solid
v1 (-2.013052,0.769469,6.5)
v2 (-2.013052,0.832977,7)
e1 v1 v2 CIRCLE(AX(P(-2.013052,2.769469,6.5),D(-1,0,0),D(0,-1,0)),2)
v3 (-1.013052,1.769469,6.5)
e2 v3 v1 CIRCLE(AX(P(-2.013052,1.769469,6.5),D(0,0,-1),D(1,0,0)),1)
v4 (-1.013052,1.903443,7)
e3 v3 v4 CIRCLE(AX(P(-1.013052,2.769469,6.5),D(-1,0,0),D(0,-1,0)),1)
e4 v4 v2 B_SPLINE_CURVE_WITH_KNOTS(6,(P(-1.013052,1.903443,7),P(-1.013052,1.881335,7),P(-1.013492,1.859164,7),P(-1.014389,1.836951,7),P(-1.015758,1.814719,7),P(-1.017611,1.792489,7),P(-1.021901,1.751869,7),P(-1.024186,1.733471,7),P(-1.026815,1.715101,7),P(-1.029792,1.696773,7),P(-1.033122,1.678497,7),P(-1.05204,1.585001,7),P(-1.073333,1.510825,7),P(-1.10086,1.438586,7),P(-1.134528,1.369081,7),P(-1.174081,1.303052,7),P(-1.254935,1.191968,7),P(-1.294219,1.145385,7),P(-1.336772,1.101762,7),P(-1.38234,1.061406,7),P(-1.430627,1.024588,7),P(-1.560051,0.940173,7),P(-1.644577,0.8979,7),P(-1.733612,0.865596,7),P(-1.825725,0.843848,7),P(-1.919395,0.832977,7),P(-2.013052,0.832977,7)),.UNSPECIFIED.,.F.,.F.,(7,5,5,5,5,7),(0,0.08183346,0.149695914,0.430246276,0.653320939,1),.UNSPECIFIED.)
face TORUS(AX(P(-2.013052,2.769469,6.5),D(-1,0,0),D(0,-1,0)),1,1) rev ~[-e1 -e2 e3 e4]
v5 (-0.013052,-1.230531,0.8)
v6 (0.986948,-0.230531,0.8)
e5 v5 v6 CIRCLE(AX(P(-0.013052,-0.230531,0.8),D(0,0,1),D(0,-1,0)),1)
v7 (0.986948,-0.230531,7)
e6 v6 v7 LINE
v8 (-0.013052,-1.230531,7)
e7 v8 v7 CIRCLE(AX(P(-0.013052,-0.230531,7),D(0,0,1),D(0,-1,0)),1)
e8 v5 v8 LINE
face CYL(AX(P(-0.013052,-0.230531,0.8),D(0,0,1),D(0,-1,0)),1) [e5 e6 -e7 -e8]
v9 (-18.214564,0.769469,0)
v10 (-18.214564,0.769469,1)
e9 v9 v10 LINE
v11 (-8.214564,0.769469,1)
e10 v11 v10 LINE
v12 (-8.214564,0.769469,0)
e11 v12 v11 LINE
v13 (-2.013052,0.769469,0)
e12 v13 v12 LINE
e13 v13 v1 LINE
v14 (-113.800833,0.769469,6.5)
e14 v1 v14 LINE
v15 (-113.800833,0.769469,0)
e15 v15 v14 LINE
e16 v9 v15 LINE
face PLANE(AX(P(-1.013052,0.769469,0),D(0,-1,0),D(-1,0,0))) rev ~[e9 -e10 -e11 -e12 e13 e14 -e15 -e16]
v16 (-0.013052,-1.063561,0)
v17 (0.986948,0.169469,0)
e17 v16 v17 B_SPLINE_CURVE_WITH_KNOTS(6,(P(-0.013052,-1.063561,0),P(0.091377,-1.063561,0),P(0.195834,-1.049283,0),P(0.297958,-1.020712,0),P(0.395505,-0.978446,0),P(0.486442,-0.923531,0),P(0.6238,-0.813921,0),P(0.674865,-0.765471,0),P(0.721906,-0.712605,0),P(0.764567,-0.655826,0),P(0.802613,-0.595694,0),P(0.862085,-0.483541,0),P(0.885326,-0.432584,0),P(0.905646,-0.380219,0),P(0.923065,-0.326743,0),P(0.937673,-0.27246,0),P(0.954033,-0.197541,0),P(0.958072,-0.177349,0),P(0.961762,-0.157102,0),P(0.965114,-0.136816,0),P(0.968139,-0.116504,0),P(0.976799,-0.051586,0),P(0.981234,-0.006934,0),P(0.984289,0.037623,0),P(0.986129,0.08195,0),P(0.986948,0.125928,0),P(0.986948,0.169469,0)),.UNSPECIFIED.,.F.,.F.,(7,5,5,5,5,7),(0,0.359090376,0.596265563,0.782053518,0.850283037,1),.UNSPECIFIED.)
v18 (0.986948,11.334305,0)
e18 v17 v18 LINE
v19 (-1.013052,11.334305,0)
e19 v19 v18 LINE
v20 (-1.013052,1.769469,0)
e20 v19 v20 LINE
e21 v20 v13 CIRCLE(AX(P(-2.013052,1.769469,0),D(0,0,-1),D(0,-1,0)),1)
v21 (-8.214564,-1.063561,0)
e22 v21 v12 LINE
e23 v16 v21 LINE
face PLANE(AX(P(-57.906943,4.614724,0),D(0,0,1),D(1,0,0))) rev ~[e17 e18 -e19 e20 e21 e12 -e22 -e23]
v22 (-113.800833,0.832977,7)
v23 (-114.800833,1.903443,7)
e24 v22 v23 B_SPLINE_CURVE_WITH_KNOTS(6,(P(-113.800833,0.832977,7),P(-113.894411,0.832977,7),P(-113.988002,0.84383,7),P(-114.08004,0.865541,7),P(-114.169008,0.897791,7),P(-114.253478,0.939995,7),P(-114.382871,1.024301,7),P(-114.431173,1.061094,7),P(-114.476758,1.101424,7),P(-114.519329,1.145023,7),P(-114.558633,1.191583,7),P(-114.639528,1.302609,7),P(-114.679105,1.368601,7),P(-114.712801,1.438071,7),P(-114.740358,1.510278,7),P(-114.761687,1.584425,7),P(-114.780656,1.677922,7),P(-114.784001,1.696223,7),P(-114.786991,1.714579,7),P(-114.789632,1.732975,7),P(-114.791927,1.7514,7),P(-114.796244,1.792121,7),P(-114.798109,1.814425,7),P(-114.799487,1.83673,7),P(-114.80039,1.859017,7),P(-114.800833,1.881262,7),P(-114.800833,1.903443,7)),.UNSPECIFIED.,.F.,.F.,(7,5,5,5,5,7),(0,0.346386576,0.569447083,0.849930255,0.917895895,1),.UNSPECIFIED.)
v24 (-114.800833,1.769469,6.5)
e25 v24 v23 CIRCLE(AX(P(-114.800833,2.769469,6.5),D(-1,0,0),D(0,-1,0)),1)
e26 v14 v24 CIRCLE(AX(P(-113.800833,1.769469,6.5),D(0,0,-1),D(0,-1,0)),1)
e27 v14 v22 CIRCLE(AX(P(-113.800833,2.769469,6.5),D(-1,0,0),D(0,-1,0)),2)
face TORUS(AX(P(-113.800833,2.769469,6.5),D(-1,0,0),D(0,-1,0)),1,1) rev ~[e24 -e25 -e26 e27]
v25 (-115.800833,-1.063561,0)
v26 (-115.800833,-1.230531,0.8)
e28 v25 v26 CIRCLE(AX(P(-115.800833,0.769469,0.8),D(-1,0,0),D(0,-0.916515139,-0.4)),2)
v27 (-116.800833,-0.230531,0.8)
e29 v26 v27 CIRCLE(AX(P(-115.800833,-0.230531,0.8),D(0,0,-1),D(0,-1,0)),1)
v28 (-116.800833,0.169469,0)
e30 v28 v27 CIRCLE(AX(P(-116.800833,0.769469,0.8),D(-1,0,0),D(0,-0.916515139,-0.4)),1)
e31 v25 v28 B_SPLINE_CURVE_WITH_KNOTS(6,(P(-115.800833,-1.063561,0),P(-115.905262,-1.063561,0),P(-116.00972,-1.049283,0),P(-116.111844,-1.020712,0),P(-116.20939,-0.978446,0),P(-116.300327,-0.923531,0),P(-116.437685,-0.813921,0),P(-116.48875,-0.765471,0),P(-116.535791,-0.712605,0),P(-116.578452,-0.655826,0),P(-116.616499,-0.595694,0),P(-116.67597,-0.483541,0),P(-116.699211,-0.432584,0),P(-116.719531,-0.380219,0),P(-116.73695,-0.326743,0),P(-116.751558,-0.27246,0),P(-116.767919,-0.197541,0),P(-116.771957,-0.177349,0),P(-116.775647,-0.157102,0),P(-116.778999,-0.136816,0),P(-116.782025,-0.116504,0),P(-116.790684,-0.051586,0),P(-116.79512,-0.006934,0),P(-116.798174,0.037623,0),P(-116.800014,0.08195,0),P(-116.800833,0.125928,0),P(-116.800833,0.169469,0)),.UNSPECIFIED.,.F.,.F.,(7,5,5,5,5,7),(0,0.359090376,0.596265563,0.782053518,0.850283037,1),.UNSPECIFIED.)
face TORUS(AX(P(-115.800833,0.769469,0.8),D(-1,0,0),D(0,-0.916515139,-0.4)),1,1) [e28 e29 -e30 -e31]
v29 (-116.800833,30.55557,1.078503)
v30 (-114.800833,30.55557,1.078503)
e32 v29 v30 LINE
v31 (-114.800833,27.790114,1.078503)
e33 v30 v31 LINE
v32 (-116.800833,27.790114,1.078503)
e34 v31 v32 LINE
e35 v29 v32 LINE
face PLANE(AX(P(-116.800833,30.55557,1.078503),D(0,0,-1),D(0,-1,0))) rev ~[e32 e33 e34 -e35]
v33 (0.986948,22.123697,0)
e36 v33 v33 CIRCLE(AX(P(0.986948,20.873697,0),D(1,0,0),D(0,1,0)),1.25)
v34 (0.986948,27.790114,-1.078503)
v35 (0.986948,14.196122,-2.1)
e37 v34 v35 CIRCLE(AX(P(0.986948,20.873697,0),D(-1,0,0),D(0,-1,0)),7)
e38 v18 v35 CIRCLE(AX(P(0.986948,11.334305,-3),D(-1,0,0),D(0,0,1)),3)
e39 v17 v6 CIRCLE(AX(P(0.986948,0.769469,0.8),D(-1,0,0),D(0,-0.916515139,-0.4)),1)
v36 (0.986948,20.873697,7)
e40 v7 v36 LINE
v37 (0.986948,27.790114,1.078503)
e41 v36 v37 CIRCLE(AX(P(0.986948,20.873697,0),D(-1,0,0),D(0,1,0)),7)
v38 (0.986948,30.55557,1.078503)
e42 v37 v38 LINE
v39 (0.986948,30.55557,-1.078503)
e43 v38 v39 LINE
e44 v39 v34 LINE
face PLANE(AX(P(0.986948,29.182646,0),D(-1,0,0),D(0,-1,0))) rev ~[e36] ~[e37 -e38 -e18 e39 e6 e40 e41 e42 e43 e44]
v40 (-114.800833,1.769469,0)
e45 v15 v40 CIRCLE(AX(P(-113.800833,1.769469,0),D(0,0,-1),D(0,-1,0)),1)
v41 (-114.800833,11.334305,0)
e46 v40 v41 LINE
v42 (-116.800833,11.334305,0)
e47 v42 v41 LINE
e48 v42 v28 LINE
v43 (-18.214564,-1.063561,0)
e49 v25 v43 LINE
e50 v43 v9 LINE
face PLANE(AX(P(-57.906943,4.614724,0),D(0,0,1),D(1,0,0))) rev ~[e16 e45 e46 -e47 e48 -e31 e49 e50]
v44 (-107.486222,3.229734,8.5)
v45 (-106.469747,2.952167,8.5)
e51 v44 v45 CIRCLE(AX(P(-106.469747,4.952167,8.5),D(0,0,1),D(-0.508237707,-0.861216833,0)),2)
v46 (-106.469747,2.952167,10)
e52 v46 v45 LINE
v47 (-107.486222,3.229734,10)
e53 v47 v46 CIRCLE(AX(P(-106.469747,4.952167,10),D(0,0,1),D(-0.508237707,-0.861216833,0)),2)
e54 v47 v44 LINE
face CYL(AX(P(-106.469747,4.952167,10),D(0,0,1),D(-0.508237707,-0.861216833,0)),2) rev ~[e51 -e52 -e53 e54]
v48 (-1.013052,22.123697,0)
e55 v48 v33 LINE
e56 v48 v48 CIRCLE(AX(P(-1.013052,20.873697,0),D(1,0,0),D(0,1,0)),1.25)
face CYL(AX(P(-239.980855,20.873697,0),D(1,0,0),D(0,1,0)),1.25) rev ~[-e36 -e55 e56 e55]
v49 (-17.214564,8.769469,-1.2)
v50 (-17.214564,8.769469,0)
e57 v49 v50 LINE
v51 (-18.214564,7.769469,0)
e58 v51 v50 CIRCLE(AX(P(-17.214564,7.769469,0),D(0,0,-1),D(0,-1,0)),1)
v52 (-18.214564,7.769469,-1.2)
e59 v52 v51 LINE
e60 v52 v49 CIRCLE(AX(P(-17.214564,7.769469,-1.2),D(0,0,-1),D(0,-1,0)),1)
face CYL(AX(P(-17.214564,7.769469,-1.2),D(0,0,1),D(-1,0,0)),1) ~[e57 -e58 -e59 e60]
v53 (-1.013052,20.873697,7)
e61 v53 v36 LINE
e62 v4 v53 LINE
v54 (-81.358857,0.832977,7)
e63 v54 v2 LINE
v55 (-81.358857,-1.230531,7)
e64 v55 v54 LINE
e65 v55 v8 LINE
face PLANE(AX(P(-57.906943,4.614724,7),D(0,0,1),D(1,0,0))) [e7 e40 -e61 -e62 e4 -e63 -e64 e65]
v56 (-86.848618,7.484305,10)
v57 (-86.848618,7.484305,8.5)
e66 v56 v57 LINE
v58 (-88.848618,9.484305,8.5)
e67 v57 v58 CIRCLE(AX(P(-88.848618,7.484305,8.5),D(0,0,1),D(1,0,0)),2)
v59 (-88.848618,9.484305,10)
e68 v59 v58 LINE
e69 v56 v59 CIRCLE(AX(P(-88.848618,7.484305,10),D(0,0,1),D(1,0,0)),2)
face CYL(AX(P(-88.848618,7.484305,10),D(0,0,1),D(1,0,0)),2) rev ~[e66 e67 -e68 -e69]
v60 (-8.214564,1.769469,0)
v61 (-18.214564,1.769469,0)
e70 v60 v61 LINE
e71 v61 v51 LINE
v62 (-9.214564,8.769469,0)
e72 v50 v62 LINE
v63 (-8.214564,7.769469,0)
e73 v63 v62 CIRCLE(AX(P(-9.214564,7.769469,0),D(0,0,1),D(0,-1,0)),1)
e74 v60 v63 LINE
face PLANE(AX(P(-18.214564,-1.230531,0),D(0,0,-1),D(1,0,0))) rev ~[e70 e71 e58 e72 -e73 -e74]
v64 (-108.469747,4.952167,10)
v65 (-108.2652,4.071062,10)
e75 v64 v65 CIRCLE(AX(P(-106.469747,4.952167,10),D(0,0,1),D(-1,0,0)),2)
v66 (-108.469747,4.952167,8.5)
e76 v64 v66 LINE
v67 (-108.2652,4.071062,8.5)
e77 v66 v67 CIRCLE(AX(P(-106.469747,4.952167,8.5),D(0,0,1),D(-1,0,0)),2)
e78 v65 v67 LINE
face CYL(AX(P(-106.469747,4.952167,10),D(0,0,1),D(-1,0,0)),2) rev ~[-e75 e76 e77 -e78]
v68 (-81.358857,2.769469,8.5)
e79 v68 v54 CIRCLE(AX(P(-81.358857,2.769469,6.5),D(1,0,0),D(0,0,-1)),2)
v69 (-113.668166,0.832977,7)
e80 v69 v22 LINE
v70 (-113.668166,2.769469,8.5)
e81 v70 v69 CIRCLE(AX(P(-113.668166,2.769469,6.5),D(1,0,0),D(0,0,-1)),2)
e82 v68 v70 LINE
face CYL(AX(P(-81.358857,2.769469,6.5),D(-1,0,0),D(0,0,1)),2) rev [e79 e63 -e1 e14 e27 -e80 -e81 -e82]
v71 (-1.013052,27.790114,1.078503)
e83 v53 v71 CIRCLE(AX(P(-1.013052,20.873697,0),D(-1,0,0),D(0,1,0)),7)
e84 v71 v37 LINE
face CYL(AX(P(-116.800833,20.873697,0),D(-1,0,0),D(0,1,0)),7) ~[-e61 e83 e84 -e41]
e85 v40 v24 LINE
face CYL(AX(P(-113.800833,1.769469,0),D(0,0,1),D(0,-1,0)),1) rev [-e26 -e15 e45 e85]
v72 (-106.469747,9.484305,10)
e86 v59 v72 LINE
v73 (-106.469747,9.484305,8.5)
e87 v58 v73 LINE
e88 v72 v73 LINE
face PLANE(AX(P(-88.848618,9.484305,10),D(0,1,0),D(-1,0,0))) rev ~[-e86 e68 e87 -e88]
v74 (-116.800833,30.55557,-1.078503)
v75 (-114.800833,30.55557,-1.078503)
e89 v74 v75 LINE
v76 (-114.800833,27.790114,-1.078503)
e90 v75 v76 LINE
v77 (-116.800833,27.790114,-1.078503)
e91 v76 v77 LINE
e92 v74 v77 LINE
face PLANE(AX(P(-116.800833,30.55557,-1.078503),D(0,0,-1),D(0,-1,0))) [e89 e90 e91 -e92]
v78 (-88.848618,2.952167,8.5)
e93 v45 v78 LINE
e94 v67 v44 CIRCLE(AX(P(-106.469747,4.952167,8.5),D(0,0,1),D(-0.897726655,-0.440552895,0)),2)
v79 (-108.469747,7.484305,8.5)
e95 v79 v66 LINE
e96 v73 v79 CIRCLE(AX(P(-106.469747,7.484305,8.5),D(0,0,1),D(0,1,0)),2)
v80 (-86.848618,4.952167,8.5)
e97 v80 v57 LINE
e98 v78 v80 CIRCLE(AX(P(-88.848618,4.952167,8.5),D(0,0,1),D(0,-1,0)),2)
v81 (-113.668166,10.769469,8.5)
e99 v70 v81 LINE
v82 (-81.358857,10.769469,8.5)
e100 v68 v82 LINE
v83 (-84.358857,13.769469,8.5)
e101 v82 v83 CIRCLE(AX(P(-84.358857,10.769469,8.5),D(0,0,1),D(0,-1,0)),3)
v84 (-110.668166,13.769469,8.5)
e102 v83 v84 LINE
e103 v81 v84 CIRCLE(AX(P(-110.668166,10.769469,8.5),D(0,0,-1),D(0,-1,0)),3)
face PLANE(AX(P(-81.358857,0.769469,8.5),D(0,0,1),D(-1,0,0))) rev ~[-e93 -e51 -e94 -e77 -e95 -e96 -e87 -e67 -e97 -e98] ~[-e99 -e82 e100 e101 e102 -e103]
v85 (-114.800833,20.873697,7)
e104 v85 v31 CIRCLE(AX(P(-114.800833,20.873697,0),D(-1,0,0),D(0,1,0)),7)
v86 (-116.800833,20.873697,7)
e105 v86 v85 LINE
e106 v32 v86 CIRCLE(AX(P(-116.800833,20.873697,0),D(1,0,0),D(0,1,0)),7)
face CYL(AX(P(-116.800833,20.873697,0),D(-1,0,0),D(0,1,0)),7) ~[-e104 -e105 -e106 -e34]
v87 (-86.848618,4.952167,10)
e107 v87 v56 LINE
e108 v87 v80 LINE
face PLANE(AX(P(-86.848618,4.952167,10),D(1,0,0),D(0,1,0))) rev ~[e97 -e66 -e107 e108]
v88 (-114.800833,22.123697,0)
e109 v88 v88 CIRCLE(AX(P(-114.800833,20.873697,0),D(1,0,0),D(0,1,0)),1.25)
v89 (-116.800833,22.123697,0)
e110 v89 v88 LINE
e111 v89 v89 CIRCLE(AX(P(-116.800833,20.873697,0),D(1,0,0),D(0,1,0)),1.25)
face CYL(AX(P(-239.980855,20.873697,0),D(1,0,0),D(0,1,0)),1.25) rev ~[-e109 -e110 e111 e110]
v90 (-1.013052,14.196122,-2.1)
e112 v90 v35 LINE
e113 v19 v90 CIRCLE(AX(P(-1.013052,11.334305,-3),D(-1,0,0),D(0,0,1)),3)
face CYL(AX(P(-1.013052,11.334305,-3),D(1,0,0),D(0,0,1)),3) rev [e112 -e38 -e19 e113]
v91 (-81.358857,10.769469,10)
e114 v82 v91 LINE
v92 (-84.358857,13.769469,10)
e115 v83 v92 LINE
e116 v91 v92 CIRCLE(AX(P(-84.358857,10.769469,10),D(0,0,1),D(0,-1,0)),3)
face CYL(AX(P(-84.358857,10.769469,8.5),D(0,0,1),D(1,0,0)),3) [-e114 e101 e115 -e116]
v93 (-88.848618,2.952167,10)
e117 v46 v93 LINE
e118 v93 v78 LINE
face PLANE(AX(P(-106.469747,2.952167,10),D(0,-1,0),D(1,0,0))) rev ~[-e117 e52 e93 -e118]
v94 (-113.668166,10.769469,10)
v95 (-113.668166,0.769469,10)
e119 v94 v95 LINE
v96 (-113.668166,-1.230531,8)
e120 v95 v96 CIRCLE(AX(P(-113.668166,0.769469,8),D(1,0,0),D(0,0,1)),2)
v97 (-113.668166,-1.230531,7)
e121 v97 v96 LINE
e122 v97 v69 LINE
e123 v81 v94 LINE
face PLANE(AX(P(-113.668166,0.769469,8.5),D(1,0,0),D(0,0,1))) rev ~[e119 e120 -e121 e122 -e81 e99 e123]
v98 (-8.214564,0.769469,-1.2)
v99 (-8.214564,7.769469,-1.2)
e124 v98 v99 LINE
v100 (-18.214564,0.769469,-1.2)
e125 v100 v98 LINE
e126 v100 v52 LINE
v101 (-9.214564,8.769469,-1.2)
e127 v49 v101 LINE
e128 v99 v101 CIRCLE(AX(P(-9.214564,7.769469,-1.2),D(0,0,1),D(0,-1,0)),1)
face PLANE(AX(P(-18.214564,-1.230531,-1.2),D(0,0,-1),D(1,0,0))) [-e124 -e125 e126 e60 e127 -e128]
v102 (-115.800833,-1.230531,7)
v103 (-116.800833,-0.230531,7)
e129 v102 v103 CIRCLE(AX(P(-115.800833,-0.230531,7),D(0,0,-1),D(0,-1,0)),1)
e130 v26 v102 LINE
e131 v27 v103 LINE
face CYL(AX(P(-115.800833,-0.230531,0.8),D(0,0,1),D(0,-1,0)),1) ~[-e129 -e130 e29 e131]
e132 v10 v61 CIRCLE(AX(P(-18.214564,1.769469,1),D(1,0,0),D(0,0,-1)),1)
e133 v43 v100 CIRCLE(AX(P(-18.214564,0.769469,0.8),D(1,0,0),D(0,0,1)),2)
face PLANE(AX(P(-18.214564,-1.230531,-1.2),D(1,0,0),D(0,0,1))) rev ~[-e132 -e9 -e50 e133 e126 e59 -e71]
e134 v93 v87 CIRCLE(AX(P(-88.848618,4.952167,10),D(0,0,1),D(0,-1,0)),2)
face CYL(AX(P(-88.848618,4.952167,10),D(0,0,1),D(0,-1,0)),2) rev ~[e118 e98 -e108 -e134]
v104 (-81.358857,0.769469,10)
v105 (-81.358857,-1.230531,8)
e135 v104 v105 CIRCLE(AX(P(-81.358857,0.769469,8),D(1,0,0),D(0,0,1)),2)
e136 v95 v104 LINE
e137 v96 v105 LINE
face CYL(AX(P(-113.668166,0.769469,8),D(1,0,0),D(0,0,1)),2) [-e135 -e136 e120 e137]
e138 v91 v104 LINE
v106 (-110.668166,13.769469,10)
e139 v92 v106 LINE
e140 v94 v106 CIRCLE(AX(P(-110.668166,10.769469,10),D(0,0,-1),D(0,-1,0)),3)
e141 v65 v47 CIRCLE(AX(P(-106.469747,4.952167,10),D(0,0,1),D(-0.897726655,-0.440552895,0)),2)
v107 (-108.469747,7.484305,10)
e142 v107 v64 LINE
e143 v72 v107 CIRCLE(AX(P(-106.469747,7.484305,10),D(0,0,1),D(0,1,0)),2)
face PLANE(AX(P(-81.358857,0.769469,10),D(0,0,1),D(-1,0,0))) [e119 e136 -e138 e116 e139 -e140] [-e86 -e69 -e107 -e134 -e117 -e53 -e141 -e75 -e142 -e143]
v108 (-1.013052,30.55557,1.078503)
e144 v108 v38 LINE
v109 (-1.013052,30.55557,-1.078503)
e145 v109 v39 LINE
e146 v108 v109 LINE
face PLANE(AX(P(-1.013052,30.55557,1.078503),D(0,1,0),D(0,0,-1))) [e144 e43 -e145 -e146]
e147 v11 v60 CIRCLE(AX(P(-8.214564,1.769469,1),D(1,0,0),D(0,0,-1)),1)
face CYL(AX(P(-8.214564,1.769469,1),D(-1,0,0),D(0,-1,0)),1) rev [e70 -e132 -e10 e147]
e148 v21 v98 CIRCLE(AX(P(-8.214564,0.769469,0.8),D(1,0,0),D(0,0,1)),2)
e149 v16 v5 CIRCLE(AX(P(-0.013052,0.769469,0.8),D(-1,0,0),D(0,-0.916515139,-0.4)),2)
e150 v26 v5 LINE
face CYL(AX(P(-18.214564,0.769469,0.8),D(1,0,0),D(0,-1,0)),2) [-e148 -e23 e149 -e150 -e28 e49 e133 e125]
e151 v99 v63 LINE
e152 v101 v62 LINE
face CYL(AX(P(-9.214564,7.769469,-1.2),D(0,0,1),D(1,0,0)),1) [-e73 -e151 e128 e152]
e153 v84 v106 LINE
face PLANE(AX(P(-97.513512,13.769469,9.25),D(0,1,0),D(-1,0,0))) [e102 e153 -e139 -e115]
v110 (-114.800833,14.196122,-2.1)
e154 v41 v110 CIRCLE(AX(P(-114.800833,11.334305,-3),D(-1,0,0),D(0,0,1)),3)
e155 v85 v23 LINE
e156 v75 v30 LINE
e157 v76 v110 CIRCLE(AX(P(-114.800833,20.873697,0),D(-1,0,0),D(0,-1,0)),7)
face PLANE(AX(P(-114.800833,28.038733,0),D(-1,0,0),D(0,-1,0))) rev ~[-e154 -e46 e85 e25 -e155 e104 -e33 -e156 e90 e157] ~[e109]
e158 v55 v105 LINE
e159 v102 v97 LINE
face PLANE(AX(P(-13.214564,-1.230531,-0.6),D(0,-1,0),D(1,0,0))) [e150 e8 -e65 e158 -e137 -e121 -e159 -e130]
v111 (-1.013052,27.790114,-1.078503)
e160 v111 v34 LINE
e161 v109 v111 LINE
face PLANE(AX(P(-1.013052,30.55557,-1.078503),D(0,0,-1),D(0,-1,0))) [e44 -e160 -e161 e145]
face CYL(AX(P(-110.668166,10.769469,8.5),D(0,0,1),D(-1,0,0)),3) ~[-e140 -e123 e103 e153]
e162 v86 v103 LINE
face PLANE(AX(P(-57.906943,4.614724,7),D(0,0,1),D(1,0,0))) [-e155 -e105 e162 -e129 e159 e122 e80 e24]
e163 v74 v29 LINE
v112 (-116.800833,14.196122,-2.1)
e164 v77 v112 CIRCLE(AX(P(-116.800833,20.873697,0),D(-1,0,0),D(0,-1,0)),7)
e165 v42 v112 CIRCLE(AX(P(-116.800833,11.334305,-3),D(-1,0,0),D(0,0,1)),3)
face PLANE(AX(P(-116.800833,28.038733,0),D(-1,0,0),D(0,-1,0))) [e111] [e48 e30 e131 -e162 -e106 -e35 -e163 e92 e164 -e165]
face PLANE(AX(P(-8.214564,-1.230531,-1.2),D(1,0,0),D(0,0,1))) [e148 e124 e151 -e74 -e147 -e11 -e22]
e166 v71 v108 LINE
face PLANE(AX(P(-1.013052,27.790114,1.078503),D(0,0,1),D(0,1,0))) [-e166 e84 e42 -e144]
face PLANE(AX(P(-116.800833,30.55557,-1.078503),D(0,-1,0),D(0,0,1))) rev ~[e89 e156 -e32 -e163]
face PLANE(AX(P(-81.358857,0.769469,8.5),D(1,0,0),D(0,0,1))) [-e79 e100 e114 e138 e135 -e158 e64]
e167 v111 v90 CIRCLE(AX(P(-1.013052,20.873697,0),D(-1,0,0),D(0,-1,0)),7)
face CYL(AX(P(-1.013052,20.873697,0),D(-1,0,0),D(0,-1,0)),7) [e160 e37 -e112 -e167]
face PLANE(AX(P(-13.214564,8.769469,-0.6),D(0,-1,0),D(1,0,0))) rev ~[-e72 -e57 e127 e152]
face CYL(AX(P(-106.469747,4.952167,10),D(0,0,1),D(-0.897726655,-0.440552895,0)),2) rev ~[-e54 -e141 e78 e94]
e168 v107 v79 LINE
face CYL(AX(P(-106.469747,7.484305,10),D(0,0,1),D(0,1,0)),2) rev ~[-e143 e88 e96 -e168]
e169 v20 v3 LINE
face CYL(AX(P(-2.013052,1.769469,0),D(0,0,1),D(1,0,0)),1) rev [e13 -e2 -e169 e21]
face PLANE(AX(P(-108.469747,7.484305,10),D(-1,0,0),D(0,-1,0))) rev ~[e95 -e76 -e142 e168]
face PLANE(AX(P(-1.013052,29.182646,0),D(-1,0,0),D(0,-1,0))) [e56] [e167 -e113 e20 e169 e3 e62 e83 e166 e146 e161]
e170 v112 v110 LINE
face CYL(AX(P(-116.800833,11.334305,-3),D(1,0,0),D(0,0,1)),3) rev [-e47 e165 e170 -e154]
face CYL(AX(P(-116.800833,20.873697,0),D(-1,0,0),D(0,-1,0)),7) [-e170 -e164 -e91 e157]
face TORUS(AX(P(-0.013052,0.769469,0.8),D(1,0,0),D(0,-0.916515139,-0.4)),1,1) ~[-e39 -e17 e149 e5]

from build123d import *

# Parameters (mm, degrees)
F1_DEPTH  = 7
F2_R      = 7
F3_DEPTH  = 2
F4_R      = 7
F5_DEPTH  = 2
F6_W      = 32.3093086481
F6_H      = 2
F7_DEPTH  = 3
F8_W      = 32.3093086481
F8_H      = 1.5
F9_DEPTH  = 13
F11_W     = 10
F11_H     = 1.2
F12_DEPTH = 10
F13_DEPTH = 25
F14_R     = 3
F15_R     = 2
F16_R     = 1
F17_DEPTH = 117.7887811979
F18_R     = 3
F19_W     = 5.0336755812
F19_H     = 2.1570066456
F20_DEPTH = 2
F22_DEPTH = 2
F23_D     = 2.5


with BuildPart() as f1:
    # F0 (on Top) → F1 (new body)
    with BuildSketch(Plane.XY):
        Polygon((-114.8008331656, 27.8736967593), (-116.8008331656, 27.8736967593), (-116.8008331656, -1.2305311393), (0.9869479323, -1.2305311393), (0.9869479323, 27.8736967593), (-1.0130520677, 27.8736967593), (-1.0130520677, 0.7694688607), (-114.8008331656, 0.7694688607), align=None)
    extrude(amount=F1_DEPTH)

    # F2 (on face) → F3 (join)
    with BuildSketch(Plane(origin=(-116.8008331656, 0, 0), x_dir=(0, -1, 0), z_dir=(-1, 0, 0))):
        with Locations((-20.8736967593, 0)):
            Circle(F2_R)
    extrude(amount=-F3_DEPTH)

    # F4 (on face) → F5 (join)
    with BuildSketch(Plane(origin=(-1.0130520677, 0, 0), x_dir=(0, -1, 0), z_dir=(-1, 0, 0))):
        with Locations((-20.8736967593, 0)):
            Circle(F4_R)
    extrude(amount=-F5_DEPTH)

    # F6 (on face) → F7 (join)
    with BuildSketch(Plane.XY.offset(7)):
        with Locations((-97.5135117769, -0.2305311393)):
            Rectangle(F6_W, F6_H)
    extrude(amount=F7_DEPTH)

    # F8 (on face) → F9 (join)
    with BuildSketch(Plane(origin=(0, 0.7694688607, 0), x_dir=(-1, 0, 0), z_dir=(0, 1, 0))):
        with Locations((97.5135117769, 9.25)):
            Rectangle(F8_W, F8_H)
    extrude(amount=F9_DEPTH)

    # F11 (on face) → F12 (join)
    with BuildSketch(Plane.XZ.offset(1.2305311393)):
        with Locations((-13.2145643048, -0.6)):
            Rectangle(F11_W, F11_H)
    extrude(amount=-F12_DEPTH)

    # F10 (on face) → F13 (cut)
    with BuildSketch(Plane.XY.offset(10)):
        with BuildLine():
            ThreePointArc((-86.8486179709, 7.4843045808), (-87.4344044086, 8.8985181432), (-88.8486179709, 9.4843045808))
            Line((-88.8486179709, 9.4843045808), (-106.4697470069, 9.4843045808))
            ThreePointArc((-106.4697470069, 9.4843045808), (-107.8839605693, 8.8985181432), (-108.4697470069, 7.4843045808))
            Line((-108.4697470069, 7.4843045808), (-108.4697470069, 4.9521672986))
            ThreePointArc((-108.4697470069, 4.9521672986), (-108.4179393254, 4.4998989157), (-108.2652003167, 4.0710615092))
            ThreePointArc((-108.2652003167, 4.0710615092), (-107.9372939182, 3.5933788445), (-107.4862224218, 3.2297336335))
            ThreePointArc((-107.4862224218, 3.2297336335), (-106.996592653, 3.0228063513), (-106.4697470069, 2.9521672986))
            Line((-106.4697470069, 2.9521672986), (-88.8486179709, 2.9521672986))
            ThreePointArc((-88.8486179709, 2.9521672986), (-87.4344044086, 3.5379537363), (-86.8486179709, 4.9521672986))
            Line((-86.8486179709, 4.9521672986), (-86.8486179709, 7.4843045808))
        make_face()
    extrude(amount=-F13_DEPTH, mode=Mode.SUBTRACT)

    # F14
    f14_edges = [f1.edges().sort_by_distance(p)[0] for p in [
        (-113.668166, 13.769469, 9.25),
        (-81.358857, 13.769469, 9.25),
    ]]
    fillet(f14_edges, radius=F14_R)

    # F15
    f15_edges = [f1.edges().sort_by_distance(p)[0] for p in [
        (-97.513512, -1.230531, 10),
        (-97.513512, 0.769469, 8.5),
        (-13.214564, -1.230531, -1.2),
    ]]
    fillet(f15_edges, radius=F15_R)

    # F16
    f16_edges = [f1.edges().sort_by_distance(p)[0] for p in [
        (-13.214564, 0.769469, 0),
        (-1.013052, 0.769469, 3.25),
        (0.986948, -1.230531, 3.9),
        (-116.800833, -1.230531, 3.9),
        (-114.800833, 0.769469, 3.25),
        (-18.214564, 8.769469, -0.6),
        (-8.214564, 8.769469, -0.6),
        (-1.013052, 0.785409, 6.752009),
        (-114.800833, 0.785409, 6.752009),
        (-116.800833, -1.188344, 0.391381),
        (0.986948, -1.188344, 0.391381),
    ]]
    fillet(f16_edges, radius=F16_R)

    # F2 (on face) → F17 (cut, through all)
    with BuildSketch(Plane(origin=(-116.8008331656, 0, 0), x_dir=(0, -1, 0), z_dir=(-1, 0, 0))):
        with BuildLine():
            Line((-27.8736967593, 7), (-27.8736967593, 0))
            ThreePointArc((-27.8736967593, 0), (-25.8234442276, 4.9497474683), (-20.8736967593, 7))
            Line((-20.8736967593, 7), (-27.8736967593, 7))
        make_face()
    extrude(amount=-F17_DEPTH, mode=Mode.SUBTRACT)

    # F18
    f18_edges = [f1.edges().sort_by_distance(p)[0] for p in [
        (-115.800833, 13.873697, 0),
        (-0.013052, 13.873697, 0),
    ]]
    fillet(f18_edges, radius=F18_R)

    # F19 (on face) → F20 (join)
    with BuildSketch(Plane(origin=(-116.8008331656, 0, 0), x_dir=(0, -1, 0), z_dir=(-1, 0, 0))):
        with Locations((-28.0387327075, 0)):
            Rectangle(F19_W, F19_H)
    extrude(amount=-F20_DEPTH)

    # F21 (on face) → F22 (join)
    with BuildSketch(Plane(origin=(-1.0130520677, 0, 0), x_dir=(0, -1, 0), z_dir=(-1, 0, 0))):
        with BuildLine():
            Line((-27.7901142267, 1.0785033228), (-30.5555704981, 1.0785033228))
            Line((-30.5555704981, 1.0785033228), (-30.5555704981, -1.0785033228))
            Line((-30.5555704981, -1.0785033228), (-27.7901142267, -1.0785033228))
            ThreePointArc((-27.7901142267, -1.0785033228), (-27.8736967593, 0), (-27.7901142267, 1.0785033228))
        make_face()
    extrude(amount=-F22_DEPTH)

    # F23 (through all)
    with Locations(Plane(origin=(-116.8008331656, 0, 0), x_dir=(0, -1, 0), z_dir=(-1, 0, 0))):
        with Locations((-20.8736967593, 0)):
            Hole(F23_D / 2)


solid = f1.part
